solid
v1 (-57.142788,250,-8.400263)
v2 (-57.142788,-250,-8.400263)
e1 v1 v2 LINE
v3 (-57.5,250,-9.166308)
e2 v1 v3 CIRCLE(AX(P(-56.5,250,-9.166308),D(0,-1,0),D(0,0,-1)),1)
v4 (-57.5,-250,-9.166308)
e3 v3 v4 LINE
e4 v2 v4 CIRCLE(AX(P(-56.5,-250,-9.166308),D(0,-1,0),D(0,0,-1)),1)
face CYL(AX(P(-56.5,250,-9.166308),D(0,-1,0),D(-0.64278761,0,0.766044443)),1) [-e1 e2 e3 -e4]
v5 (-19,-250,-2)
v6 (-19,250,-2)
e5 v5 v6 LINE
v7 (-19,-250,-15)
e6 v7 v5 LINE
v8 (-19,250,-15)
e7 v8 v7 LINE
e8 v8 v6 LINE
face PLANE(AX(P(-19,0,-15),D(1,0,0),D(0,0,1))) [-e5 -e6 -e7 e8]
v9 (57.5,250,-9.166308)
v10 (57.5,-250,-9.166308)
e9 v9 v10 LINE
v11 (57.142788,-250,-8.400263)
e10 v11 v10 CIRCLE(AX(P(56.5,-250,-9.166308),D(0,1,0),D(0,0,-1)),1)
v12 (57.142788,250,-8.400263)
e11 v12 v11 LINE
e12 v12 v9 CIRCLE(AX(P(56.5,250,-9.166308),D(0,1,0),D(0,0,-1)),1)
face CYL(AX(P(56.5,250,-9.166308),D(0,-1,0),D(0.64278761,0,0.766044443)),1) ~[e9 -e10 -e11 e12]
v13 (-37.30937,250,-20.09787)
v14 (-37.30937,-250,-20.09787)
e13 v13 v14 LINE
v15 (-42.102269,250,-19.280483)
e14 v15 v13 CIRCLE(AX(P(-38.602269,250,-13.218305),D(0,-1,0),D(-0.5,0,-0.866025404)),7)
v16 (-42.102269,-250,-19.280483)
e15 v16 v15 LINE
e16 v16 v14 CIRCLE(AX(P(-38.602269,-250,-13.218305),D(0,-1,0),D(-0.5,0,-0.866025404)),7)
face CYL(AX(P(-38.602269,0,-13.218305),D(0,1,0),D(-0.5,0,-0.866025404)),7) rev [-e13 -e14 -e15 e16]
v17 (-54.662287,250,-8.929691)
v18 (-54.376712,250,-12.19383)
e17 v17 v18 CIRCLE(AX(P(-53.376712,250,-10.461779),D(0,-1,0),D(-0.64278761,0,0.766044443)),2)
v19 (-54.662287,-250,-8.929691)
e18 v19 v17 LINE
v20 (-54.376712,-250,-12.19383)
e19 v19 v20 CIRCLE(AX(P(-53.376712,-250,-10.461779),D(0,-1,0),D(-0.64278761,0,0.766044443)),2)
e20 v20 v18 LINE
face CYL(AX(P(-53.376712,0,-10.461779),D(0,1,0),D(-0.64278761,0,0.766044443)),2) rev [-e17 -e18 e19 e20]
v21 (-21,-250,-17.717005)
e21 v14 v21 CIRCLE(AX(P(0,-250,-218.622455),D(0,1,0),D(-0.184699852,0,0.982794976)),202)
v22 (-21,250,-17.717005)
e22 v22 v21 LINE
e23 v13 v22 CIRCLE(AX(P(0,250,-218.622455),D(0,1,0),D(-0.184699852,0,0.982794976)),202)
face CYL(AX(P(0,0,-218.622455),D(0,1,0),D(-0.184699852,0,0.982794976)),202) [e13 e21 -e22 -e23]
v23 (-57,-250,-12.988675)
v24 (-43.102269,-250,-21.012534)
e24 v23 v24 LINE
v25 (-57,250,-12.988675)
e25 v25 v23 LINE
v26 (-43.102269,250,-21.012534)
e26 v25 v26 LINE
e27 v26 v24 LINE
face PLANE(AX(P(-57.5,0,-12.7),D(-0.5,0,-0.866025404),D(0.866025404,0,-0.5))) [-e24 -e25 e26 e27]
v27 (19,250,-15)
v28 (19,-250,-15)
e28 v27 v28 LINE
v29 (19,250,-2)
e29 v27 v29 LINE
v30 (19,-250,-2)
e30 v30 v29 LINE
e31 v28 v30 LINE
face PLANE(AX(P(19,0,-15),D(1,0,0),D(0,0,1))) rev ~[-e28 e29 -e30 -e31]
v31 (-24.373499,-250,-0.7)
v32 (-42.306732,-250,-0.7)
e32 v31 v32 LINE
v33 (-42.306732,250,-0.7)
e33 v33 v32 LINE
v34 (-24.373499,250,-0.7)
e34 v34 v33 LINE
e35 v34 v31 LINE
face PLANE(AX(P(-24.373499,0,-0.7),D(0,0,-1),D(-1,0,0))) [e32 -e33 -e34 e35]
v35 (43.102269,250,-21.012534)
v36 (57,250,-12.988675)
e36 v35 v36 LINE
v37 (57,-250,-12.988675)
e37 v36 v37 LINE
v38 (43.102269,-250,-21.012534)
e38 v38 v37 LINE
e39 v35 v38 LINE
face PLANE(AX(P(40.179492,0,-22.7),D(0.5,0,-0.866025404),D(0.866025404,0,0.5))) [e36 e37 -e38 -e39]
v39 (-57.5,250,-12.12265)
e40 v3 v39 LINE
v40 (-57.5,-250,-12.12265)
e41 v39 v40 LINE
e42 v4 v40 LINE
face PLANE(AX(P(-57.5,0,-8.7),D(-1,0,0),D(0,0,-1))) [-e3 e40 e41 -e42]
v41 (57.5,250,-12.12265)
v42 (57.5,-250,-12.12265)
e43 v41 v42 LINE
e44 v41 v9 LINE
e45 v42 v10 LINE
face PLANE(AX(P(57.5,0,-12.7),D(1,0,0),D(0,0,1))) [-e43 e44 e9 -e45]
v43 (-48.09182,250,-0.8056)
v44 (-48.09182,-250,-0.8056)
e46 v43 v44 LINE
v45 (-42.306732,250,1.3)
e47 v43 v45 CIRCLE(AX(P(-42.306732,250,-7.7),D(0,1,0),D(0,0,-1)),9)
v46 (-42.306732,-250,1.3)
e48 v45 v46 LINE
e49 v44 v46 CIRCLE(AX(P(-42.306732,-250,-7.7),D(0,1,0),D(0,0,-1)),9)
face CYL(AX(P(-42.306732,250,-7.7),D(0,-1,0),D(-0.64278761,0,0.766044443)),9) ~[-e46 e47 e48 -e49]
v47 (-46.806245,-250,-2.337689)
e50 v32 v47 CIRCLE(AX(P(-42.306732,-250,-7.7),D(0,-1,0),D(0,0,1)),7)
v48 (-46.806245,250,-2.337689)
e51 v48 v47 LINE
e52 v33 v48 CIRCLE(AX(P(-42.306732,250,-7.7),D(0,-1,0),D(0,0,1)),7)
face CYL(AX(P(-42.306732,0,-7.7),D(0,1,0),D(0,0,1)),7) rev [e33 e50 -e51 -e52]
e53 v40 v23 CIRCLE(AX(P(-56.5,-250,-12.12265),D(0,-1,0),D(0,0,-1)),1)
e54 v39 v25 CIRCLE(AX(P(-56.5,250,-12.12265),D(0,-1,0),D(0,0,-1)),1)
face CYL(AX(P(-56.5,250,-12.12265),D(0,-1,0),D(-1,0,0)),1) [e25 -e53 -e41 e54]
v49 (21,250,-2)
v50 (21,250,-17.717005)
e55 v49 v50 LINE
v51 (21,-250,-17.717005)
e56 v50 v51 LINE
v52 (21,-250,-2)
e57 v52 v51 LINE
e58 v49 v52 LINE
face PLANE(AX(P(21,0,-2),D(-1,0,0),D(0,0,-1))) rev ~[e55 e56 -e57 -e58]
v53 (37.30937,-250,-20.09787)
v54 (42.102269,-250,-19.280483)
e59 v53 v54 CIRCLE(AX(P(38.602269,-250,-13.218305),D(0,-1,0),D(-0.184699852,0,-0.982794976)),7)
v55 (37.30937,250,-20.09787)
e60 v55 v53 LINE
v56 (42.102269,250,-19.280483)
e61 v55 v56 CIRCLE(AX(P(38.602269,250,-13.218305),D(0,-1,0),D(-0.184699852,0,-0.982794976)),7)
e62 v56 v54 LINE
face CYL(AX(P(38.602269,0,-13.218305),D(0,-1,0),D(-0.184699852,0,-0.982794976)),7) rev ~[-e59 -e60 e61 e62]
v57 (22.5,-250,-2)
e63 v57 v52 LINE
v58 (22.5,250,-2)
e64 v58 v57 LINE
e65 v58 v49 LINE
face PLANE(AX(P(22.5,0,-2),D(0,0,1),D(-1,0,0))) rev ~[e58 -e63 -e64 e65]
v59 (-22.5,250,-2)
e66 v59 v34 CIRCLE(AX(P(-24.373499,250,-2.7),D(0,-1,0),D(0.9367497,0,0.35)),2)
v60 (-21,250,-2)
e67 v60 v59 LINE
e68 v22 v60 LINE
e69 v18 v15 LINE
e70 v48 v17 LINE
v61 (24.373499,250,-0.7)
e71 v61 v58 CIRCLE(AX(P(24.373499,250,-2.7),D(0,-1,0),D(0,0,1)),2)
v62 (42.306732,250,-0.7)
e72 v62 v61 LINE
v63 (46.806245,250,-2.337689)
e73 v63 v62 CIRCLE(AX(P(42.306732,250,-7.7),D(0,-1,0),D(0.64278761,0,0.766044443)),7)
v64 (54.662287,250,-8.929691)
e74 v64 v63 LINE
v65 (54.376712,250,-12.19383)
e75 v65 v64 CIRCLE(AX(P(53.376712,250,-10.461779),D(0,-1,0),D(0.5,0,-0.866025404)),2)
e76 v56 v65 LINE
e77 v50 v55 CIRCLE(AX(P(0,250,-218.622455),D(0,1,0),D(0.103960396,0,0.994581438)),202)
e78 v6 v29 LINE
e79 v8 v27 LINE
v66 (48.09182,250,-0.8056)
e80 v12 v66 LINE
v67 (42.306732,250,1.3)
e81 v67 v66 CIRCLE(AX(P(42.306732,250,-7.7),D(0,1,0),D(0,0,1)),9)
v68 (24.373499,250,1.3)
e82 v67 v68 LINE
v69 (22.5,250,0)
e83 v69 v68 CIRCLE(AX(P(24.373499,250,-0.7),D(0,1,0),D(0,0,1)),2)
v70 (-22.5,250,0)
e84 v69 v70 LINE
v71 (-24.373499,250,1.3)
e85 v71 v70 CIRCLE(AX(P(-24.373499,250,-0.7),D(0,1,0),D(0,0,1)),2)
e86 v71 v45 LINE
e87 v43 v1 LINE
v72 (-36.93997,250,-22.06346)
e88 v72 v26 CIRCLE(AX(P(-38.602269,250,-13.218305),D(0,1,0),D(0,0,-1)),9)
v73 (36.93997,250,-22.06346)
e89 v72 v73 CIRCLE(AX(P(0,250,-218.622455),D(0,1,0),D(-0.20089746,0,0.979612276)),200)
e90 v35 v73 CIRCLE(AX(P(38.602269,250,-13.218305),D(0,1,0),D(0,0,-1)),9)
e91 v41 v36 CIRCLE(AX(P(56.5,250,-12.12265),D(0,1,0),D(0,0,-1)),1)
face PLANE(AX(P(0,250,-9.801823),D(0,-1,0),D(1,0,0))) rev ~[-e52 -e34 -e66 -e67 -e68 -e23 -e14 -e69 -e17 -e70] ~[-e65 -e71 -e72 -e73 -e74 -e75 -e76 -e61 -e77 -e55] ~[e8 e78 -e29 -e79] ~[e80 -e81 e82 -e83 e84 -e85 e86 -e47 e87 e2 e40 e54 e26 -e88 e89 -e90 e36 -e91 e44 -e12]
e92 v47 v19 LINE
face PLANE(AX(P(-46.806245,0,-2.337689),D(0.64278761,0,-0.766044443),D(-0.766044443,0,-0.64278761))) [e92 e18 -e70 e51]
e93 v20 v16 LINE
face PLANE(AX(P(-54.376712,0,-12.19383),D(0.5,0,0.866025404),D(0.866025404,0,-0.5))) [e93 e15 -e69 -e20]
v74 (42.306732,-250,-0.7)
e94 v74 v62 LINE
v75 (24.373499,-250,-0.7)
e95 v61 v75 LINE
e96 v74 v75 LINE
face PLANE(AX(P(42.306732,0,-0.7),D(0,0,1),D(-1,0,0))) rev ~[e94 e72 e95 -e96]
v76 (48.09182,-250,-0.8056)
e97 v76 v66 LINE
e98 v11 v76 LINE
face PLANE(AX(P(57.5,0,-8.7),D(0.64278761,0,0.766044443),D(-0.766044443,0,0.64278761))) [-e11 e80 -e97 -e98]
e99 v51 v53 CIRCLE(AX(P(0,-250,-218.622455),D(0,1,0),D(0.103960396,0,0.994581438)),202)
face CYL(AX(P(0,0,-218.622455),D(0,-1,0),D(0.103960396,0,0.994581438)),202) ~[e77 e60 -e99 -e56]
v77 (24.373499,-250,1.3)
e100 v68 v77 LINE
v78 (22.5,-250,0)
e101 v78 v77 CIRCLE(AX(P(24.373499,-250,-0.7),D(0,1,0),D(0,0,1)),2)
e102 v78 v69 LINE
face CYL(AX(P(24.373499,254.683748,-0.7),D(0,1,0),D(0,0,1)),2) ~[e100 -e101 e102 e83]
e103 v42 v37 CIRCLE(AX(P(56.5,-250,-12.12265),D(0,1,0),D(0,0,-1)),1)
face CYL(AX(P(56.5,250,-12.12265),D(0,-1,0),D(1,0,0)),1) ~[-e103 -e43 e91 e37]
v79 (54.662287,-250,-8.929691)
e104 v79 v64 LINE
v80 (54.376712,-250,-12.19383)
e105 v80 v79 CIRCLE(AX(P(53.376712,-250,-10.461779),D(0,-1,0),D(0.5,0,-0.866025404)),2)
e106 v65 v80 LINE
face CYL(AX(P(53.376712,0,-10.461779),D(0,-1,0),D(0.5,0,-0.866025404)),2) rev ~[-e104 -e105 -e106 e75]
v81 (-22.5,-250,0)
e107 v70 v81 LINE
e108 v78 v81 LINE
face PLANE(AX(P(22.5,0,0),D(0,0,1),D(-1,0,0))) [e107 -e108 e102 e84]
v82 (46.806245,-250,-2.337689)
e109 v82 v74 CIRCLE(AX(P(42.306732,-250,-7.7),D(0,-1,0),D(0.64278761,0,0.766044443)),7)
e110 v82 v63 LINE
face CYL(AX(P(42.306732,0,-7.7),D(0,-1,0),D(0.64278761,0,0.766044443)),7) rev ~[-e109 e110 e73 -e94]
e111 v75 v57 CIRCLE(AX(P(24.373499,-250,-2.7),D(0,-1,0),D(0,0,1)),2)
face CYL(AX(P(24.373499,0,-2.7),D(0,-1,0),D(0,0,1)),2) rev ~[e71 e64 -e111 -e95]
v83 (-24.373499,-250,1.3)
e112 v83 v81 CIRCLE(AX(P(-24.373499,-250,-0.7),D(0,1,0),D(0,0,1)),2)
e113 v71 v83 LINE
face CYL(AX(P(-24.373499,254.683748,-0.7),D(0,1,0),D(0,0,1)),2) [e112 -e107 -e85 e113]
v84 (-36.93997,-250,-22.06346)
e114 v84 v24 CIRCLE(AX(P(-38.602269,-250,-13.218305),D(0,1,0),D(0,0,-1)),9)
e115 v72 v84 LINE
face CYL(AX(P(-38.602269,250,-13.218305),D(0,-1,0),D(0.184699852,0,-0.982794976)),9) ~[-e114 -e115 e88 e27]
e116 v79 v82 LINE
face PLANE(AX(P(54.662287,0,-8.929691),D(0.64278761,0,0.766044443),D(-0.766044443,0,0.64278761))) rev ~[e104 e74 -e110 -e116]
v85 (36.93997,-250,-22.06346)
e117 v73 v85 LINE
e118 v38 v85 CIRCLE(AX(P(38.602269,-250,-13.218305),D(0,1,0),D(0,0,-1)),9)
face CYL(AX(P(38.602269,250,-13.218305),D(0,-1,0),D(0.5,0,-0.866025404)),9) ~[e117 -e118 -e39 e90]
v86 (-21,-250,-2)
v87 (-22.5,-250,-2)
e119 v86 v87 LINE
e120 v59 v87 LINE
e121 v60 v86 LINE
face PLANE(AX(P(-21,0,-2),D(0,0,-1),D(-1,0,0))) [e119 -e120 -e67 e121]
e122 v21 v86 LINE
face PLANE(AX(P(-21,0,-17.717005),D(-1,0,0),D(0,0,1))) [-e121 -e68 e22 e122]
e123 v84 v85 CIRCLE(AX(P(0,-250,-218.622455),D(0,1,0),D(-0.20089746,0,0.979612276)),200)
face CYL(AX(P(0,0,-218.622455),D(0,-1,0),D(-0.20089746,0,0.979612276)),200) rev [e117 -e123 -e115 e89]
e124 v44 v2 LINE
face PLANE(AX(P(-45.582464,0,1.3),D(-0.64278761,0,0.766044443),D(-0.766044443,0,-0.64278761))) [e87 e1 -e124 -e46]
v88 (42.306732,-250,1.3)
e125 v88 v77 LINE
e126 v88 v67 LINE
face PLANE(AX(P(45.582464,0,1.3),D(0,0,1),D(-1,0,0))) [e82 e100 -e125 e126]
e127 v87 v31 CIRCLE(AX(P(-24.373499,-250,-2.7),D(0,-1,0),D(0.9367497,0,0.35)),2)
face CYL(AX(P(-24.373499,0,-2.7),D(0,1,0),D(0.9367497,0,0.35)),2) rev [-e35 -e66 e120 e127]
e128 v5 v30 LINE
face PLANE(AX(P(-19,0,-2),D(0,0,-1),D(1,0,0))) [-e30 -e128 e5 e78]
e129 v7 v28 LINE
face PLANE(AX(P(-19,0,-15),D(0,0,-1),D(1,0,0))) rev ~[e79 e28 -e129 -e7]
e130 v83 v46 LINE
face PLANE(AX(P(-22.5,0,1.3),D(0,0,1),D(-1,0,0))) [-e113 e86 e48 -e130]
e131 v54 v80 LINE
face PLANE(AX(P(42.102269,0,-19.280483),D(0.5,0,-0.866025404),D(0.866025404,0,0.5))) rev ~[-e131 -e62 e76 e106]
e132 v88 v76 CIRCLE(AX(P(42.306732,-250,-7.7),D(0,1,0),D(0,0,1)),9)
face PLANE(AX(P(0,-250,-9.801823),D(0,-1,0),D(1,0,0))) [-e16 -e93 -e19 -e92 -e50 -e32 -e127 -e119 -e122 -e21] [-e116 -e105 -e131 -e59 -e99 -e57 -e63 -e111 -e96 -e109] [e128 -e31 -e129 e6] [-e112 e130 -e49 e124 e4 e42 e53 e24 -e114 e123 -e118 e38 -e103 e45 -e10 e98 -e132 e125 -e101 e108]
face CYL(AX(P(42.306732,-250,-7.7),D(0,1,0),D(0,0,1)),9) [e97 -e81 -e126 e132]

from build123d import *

# Parameters (mm, degrees)
F1_DEPTH    = 250
F2_W        = 38
F2_H        = 13
F3_DEPTH    = 250
F4_T1_DEPTH = 509.3674969976
F5_R        = 9
F6_R        = 1
F8_DEPTH    = 250


# Not quite as in the source:
# - a fillet or chamfer that OpenCascade refuses, or shapes differently, is made with other operations: its cross-section is extruded or revolved along the edge and cut away or added


with BuildPart() as f1:
    # F0 (on Front) → F1 (new body, symmetric)
    with BuildSketch(Plane.XZ):
        with BuildLine():
            Line((22.5, 0), (0, 0))
            Line((0, 0), (-22.5, 0))
            Line((-22.5, 0), (-22.5, 1.3))
            Line((-22.5, 1.3), (-45.5824640741, 1.3))
            Line((-45.5824640741, 1.3), (-57.5, -8.7))
            Line((-57.5, -8.7), (-57.5, -12.7))
            Line((-57.5, -12.7), (-40.1794919243, -22.7))
            ThreePointArc((-40.1794919243, -22.7), (0, -18.6224551416), (40.1794919243, -22.7))
            Line((40.1794919243, -22.7), (57.5, -12.7))
            Line((57.5, -12.7), (57.5, -8.7))
            Line((57.5, -8.7), (45.5824640741, 1.3))
            Line((45.5824640741, 1.3), (22.5, 1.3))
            Line((22.5, 1.3), (22.5, 0))
        make_face()
    extrude(amount=F1_DEPTH, both=True)

    # F2 (on Front) → F3 (cut, symmetric)
    with BuildSketch(Plane.XZ):
        with Locations((0, -8.5)):
            Rectangle(F2_W, F2_H)
    extrude(amount=F3_DEPTH, both=True, mode=Mode.SUBTRACT)

    # F4: fillet of radius 2 on 2 edges, made by hand

    # F4_s2 → F4_t1 (cut)
    with BuildSketch(Plane.XZ.offset(-254.6837484988)):
        with BuildLine():
            ThreePointArc((24.3734993995, 1.3), (23.2333239744, 0.9431676725), (22.5, 0))
            Line((22.5, 0), (22.5, 1.3))
            Line((22.5, 1.3), (24.3734993995, 1.3))
        make_face()
        with BuildLine():
            ThreePointArc((-24.3734993995, 1.3), (-23.2333239744, 0.9431676725), (-22.5, 0))
            Line((-22.5, 0), (-22.5, 1.3))
            Line((-22.5, 1.3), (-24.3734993995, 1.3))
        make_face()
    extrude(amount=F4_T1_DEPTH, mode=Mode.SUBTRACT)

    # F5
    f5_edges = [f1.edges().sort_by_distance(p)[0] for p in [
        (45.582464, 0, 1.3),
        (-45.582464, 0, 1.3),
        (40.179492, 0, -22.7),
        (-40.179492, 0, -22.7),
    ]]
    fillet(f5_edges, radius=F5_R)

    # F6
    f6_edges = [f1.edges().sort_by_distance(p)[0] for p in [
        (57.5, 0, -8.7),
        (57.5, 0, -12.7),
        (-57.5, 0, -8.7),
        (-57.5, 0, -12.7),
    ]]
    fillet(f6_edges, radius=F6_R)

    # F7 (on Front) → F8 (cut, symmetric)
    with BuildSketch(Plane.XZ):
        with BuildLine():
            ThreePointArc((-42.1022690923, -19.2804830077), (-39.7790673433, -20.1186780608), (-37.3093701274, -20.0978700124))
            ThreePointArc((-37.3093701274, -20.0978700124), (-29.1789785809, -18.7410222645), (-21, -17.7170047426))
            Line((-21, -17.7170047426), (-21, -2))
            Line((-21, -2), (-22.5, -2))
            ThreePointArc((-22.5, -2), (-23.2333239744, -1.0568323275), (-24.3734993995, -0.7))
            Line((-24.3734993995, -0.7), (-42.3067319657, -0.7))
            ThreePointArc((-42.3067319657, -0.7), (-44.7008729689, -1.1221516545), (-46.8062452335, -2.3376888982))
            Line((-46.8062452335, -2.3376888982), (-54.6622869129, -8.9296905739))
            ThreePointArc((-54.6622869129, -8.9296905739), (-55.3691010897, -10.6360909457), (-54.3767116936, -12.1938302677))
            Line((-54.3767116936, -12.1938302677), (-42.1022690923, -19.2804830077))
        make_face()
        with BuildLine():
            Line((42.3067319657, -0.7), (24.3734993995, -0.7))
            ThreePointArc((24.3734993995, -0.7), (23.2333239744, -1.0568323275), (22.5, -2))
            Line((22.5, -2), (21, -2))
            Line((21, -2), (21, -17.7170047426))
            ThreePointArc((21, -17.7170047426), (29.1789785809, -18.7410222645), (37.3093701274, -20.0978700124))
            ThreePointArc((37.3093701274, -20.0978700124), (39.7790673433, -20.1186780608), (42.1022690923, -19.2804830077))
            Line((42.1022690923, -19.2804830077), (54.3767116936, -12.1938302677))
            ThreePointArc((54.3767116936, -12.1938302677), (55.3691010897, -10.6360909457), (54.6622869129, -8.9296905739))
            Line((54.6622869129, -8.9296905739), (46.8062452335, -2.3376888982))
            ThreePointArc((46.8062452335, -2.3376888982), (44.7008729689, -1.1221516545), (42.3067319657, -0.7))
        make_face()
    extrude(amount=F8_DEPTH, both=True, mode=Mode.SUBTRACT)


solid = f1.part
